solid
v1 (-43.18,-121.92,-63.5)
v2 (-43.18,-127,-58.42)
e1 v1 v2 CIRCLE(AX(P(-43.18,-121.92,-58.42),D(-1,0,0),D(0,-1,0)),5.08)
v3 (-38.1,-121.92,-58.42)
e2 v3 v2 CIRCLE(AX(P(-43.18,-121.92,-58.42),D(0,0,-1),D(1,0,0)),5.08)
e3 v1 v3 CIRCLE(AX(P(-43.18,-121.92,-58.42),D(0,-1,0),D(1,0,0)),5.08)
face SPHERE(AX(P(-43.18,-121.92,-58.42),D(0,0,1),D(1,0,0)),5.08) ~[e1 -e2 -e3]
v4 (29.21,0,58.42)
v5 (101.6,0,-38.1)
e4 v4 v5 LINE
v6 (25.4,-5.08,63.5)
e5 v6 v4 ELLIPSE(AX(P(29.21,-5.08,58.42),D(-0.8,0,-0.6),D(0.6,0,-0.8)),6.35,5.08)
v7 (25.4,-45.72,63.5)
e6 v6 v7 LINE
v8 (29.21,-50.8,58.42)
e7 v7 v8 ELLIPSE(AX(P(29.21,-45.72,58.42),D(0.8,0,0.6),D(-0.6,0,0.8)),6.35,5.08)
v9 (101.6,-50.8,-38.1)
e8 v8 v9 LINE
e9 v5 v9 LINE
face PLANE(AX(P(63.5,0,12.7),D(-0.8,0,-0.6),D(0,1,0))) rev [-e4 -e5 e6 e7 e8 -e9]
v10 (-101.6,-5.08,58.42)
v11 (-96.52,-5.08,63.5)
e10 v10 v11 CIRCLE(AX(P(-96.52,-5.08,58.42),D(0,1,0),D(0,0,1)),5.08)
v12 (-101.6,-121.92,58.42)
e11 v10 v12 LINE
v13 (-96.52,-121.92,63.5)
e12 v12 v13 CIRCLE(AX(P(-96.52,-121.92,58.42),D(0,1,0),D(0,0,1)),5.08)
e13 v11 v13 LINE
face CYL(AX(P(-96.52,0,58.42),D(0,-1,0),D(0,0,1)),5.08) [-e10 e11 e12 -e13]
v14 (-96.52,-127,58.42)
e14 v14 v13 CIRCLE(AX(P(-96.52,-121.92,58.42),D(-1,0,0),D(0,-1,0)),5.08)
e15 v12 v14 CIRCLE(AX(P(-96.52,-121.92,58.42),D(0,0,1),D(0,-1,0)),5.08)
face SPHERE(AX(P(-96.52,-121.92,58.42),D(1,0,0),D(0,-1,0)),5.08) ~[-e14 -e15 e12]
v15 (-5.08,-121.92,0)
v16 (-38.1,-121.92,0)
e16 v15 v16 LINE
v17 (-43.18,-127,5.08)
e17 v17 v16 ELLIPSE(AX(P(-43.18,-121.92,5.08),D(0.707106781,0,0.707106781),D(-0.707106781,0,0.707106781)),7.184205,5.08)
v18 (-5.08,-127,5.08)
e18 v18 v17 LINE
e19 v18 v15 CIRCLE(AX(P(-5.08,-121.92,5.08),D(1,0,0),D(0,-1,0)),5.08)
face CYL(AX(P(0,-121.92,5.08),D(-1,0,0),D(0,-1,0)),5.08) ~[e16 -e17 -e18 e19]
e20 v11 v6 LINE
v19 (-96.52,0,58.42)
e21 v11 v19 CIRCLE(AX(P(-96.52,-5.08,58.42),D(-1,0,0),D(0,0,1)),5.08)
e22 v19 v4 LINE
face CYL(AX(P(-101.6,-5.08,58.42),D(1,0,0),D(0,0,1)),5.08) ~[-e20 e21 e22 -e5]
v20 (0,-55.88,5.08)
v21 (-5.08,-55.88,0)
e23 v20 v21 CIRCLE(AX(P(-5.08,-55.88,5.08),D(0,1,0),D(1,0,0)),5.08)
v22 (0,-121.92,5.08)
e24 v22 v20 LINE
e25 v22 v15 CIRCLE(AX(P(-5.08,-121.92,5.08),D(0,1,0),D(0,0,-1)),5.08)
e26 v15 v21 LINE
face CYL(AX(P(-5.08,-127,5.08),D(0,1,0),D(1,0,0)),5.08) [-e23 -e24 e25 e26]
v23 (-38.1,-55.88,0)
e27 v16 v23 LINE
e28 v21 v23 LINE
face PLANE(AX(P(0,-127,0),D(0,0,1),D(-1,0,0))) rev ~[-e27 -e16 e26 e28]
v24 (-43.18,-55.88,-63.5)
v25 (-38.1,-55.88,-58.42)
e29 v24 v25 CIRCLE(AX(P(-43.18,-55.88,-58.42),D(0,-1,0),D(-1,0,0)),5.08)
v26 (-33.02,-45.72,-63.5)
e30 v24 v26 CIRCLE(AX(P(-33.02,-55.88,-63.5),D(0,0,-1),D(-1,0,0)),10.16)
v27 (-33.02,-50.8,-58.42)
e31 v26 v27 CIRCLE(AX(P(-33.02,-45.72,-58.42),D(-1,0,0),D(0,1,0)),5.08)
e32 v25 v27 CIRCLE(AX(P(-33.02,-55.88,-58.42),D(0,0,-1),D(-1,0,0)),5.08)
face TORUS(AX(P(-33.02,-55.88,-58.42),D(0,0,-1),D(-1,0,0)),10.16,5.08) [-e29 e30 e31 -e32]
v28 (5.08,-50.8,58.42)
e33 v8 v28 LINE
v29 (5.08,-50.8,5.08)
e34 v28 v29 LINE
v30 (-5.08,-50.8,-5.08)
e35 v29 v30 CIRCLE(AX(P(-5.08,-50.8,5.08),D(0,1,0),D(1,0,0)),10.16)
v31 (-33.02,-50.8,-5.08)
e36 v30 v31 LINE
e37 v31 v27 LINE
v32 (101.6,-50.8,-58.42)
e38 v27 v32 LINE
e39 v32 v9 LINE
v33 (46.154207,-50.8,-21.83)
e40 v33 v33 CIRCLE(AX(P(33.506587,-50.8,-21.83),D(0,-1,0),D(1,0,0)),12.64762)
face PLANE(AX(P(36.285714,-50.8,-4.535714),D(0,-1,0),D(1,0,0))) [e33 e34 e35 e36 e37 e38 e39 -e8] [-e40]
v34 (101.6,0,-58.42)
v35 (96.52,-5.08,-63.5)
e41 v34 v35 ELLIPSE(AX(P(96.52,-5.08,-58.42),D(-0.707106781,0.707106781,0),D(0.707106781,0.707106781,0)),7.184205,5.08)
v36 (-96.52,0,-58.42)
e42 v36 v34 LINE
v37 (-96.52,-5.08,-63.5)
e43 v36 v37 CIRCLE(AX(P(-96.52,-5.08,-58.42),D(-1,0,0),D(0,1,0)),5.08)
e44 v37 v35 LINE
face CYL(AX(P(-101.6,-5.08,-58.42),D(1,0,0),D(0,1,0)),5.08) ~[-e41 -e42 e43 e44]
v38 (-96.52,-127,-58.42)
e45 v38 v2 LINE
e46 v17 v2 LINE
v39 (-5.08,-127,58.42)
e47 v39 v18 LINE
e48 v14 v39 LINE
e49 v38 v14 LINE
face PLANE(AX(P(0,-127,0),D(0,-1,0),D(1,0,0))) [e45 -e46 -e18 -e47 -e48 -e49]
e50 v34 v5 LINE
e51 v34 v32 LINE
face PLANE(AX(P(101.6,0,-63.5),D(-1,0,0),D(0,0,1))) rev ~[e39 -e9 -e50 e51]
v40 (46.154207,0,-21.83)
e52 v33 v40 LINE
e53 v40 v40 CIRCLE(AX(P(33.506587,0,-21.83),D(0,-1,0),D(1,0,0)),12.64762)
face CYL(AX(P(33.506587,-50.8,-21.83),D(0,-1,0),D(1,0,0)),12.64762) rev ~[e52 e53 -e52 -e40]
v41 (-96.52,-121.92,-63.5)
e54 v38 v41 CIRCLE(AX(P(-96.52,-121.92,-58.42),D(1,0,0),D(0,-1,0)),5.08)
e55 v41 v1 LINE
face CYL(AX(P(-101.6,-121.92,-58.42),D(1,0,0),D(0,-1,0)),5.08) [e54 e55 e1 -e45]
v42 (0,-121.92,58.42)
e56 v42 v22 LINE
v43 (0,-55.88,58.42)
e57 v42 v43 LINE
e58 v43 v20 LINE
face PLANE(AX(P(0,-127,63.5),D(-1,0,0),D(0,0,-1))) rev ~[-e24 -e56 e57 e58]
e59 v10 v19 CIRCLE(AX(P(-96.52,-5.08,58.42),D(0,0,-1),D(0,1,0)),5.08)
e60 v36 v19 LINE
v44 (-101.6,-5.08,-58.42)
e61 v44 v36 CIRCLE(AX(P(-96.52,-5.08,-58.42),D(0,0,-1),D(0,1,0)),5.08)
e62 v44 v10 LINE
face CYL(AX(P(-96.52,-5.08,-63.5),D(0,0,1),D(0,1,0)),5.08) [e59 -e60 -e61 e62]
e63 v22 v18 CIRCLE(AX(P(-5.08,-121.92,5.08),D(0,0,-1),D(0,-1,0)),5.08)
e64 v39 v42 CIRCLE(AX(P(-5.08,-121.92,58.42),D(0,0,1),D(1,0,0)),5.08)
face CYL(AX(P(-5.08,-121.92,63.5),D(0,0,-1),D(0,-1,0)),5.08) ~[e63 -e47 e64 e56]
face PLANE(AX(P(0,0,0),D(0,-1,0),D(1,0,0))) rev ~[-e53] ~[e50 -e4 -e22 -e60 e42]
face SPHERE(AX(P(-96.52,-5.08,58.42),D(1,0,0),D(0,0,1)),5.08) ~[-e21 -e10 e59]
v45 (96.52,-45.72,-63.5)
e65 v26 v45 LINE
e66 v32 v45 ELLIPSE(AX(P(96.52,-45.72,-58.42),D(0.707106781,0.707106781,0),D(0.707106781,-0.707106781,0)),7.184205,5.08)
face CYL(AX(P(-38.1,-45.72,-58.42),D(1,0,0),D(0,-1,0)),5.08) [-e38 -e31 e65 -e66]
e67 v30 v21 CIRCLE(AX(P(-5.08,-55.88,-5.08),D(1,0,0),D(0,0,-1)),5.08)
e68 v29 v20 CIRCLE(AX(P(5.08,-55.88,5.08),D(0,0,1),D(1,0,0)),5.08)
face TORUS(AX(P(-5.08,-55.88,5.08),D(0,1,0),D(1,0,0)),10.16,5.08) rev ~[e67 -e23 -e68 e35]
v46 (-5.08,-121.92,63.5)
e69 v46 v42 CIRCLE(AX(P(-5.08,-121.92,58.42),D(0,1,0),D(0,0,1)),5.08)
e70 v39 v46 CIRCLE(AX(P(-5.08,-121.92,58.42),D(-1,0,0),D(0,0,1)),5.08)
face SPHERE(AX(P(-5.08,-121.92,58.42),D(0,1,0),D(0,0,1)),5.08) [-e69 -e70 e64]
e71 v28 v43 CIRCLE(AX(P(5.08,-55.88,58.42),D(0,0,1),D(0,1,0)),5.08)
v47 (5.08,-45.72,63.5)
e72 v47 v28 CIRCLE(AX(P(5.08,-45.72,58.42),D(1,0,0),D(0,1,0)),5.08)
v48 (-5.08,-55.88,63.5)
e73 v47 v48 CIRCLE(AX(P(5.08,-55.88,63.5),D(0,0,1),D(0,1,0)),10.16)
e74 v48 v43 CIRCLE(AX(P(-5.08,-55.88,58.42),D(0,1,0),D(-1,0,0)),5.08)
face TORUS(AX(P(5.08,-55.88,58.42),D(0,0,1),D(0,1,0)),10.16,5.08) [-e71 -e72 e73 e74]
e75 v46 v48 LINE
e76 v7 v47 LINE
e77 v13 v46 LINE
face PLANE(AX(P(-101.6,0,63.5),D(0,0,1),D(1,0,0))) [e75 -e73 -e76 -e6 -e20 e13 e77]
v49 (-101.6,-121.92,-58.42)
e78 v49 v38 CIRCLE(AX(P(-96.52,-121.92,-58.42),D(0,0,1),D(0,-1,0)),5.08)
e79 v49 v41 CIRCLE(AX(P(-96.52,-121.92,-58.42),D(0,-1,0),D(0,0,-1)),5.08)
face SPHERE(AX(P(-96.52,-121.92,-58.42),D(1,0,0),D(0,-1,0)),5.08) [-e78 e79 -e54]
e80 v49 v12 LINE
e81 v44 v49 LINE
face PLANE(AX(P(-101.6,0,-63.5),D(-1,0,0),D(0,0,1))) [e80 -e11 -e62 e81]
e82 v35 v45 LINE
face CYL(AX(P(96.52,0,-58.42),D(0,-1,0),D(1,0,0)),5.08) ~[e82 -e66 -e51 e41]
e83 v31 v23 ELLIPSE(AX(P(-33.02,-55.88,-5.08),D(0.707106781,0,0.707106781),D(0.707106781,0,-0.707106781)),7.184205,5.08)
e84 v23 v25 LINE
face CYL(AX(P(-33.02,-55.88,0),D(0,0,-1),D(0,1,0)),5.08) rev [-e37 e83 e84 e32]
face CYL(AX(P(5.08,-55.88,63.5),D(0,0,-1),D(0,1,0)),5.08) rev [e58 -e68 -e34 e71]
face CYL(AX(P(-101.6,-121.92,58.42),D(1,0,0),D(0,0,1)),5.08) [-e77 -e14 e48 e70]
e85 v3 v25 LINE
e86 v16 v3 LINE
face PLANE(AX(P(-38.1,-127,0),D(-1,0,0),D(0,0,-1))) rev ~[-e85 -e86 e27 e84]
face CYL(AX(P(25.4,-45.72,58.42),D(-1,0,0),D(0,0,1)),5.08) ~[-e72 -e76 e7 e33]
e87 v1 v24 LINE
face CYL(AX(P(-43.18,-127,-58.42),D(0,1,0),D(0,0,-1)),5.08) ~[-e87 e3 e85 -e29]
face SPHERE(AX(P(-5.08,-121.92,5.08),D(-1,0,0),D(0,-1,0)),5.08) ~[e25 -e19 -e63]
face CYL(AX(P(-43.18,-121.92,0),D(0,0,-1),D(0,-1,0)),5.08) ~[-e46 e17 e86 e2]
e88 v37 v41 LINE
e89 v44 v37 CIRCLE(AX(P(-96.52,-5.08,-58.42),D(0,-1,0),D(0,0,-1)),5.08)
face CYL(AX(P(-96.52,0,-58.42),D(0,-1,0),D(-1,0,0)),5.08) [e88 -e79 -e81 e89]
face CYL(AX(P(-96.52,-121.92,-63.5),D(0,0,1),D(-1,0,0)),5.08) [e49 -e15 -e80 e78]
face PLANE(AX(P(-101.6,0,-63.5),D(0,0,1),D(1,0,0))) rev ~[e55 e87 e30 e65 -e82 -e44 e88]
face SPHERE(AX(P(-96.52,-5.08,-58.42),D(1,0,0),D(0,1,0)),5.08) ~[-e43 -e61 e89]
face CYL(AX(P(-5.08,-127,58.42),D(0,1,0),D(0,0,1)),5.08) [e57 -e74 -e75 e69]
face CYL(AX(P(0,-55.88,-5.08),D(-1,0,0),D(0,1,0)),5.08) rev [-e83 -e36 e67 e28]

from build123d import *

# Parameters (mm, degrees)
F0_W     = 203.2
F0_H     = 127
F1_DEPTH = 127
F3_DEPTH = 76.2
F4_SIZE2 = 101.6
F4_SIZE  = 76.2
F5_R     = 5.08
F6_R     = 12.6476198181
F7_DEPTH = 78.486


with BuildPart() as f1:
    # F0 (on Front) → F1 (new body)
    with BuildSketch(Plane.XZ):
        Rectangle(F0_W, F0_H)
    extrude(amount=F1_DEPTH)

    # F2 (on face) → F3 (cut)
    with BuildSketch(Plane.XZ.offset(127)):
        Polygon((101.6, 63.5), (0, 63.5), (0, 0), (-38.1, 0), (-38.1, -63.5), (101.6, -63.5), align=None)
    extrude(amount=-F3_DEPTH, mode=Mode.SUBTRACT)

    # F4
    f4_edges = [f1.edges().sort_by_distance(p)[0] for p in [
        (101.6, -25.4, 63.5),
    ]]
    f4_side = f1.faces().sort_by_distance((-21.771429, -52.614286, 63.5))[0]
    chamfer(f4_edges, length=F4_SIZE, length2=F4_SIZE2, reference=f4_side)

    # F5
    f5_edges = [f1.edges().sort_by_distance(p)[0] for p in [
        (0, -88.9, 63.5),
        (-50.8, -127, 63.5),
        (-19.05, -127, 0),
        (0, -127, 31.75),
        (0, -88.9, 0),
        (-38.1, -127, -31.75),
        (-38.1, -88.9, -63.5),
        (-69.85, -127, -63.5),
        (0, -50.8, 31.75),
        (31.75, -50.8, -63.5),
        (-38.1, -50.8, -31.75),
        (0, 0, -63.5),
        (-38.1, 0, 63.5),
        (-101.6, -127, 0),
        (-101.6, -63.5, 63.5),
        (-101.6, 0, 0),
        (101.6, -25.4, -63.5),
        (-101.6, -63.5, -63.5),
        (12.7, -50.8, 63.5),
        (-19.05, -50.8, 0),
    ]]
    fillet(f5_edges, radius=F5_R)

    # F6 (on face) → F7 (cut)
    with BuildSketch(Plane.XZ.offset(50.8)):
        with Locations((33.5065871477, -21.8299999833)):
            Circle(F6_R)
    extrude(amount=-F7_DEPTH, mode=Mode.SUBTRACT)


solid = f1.part
